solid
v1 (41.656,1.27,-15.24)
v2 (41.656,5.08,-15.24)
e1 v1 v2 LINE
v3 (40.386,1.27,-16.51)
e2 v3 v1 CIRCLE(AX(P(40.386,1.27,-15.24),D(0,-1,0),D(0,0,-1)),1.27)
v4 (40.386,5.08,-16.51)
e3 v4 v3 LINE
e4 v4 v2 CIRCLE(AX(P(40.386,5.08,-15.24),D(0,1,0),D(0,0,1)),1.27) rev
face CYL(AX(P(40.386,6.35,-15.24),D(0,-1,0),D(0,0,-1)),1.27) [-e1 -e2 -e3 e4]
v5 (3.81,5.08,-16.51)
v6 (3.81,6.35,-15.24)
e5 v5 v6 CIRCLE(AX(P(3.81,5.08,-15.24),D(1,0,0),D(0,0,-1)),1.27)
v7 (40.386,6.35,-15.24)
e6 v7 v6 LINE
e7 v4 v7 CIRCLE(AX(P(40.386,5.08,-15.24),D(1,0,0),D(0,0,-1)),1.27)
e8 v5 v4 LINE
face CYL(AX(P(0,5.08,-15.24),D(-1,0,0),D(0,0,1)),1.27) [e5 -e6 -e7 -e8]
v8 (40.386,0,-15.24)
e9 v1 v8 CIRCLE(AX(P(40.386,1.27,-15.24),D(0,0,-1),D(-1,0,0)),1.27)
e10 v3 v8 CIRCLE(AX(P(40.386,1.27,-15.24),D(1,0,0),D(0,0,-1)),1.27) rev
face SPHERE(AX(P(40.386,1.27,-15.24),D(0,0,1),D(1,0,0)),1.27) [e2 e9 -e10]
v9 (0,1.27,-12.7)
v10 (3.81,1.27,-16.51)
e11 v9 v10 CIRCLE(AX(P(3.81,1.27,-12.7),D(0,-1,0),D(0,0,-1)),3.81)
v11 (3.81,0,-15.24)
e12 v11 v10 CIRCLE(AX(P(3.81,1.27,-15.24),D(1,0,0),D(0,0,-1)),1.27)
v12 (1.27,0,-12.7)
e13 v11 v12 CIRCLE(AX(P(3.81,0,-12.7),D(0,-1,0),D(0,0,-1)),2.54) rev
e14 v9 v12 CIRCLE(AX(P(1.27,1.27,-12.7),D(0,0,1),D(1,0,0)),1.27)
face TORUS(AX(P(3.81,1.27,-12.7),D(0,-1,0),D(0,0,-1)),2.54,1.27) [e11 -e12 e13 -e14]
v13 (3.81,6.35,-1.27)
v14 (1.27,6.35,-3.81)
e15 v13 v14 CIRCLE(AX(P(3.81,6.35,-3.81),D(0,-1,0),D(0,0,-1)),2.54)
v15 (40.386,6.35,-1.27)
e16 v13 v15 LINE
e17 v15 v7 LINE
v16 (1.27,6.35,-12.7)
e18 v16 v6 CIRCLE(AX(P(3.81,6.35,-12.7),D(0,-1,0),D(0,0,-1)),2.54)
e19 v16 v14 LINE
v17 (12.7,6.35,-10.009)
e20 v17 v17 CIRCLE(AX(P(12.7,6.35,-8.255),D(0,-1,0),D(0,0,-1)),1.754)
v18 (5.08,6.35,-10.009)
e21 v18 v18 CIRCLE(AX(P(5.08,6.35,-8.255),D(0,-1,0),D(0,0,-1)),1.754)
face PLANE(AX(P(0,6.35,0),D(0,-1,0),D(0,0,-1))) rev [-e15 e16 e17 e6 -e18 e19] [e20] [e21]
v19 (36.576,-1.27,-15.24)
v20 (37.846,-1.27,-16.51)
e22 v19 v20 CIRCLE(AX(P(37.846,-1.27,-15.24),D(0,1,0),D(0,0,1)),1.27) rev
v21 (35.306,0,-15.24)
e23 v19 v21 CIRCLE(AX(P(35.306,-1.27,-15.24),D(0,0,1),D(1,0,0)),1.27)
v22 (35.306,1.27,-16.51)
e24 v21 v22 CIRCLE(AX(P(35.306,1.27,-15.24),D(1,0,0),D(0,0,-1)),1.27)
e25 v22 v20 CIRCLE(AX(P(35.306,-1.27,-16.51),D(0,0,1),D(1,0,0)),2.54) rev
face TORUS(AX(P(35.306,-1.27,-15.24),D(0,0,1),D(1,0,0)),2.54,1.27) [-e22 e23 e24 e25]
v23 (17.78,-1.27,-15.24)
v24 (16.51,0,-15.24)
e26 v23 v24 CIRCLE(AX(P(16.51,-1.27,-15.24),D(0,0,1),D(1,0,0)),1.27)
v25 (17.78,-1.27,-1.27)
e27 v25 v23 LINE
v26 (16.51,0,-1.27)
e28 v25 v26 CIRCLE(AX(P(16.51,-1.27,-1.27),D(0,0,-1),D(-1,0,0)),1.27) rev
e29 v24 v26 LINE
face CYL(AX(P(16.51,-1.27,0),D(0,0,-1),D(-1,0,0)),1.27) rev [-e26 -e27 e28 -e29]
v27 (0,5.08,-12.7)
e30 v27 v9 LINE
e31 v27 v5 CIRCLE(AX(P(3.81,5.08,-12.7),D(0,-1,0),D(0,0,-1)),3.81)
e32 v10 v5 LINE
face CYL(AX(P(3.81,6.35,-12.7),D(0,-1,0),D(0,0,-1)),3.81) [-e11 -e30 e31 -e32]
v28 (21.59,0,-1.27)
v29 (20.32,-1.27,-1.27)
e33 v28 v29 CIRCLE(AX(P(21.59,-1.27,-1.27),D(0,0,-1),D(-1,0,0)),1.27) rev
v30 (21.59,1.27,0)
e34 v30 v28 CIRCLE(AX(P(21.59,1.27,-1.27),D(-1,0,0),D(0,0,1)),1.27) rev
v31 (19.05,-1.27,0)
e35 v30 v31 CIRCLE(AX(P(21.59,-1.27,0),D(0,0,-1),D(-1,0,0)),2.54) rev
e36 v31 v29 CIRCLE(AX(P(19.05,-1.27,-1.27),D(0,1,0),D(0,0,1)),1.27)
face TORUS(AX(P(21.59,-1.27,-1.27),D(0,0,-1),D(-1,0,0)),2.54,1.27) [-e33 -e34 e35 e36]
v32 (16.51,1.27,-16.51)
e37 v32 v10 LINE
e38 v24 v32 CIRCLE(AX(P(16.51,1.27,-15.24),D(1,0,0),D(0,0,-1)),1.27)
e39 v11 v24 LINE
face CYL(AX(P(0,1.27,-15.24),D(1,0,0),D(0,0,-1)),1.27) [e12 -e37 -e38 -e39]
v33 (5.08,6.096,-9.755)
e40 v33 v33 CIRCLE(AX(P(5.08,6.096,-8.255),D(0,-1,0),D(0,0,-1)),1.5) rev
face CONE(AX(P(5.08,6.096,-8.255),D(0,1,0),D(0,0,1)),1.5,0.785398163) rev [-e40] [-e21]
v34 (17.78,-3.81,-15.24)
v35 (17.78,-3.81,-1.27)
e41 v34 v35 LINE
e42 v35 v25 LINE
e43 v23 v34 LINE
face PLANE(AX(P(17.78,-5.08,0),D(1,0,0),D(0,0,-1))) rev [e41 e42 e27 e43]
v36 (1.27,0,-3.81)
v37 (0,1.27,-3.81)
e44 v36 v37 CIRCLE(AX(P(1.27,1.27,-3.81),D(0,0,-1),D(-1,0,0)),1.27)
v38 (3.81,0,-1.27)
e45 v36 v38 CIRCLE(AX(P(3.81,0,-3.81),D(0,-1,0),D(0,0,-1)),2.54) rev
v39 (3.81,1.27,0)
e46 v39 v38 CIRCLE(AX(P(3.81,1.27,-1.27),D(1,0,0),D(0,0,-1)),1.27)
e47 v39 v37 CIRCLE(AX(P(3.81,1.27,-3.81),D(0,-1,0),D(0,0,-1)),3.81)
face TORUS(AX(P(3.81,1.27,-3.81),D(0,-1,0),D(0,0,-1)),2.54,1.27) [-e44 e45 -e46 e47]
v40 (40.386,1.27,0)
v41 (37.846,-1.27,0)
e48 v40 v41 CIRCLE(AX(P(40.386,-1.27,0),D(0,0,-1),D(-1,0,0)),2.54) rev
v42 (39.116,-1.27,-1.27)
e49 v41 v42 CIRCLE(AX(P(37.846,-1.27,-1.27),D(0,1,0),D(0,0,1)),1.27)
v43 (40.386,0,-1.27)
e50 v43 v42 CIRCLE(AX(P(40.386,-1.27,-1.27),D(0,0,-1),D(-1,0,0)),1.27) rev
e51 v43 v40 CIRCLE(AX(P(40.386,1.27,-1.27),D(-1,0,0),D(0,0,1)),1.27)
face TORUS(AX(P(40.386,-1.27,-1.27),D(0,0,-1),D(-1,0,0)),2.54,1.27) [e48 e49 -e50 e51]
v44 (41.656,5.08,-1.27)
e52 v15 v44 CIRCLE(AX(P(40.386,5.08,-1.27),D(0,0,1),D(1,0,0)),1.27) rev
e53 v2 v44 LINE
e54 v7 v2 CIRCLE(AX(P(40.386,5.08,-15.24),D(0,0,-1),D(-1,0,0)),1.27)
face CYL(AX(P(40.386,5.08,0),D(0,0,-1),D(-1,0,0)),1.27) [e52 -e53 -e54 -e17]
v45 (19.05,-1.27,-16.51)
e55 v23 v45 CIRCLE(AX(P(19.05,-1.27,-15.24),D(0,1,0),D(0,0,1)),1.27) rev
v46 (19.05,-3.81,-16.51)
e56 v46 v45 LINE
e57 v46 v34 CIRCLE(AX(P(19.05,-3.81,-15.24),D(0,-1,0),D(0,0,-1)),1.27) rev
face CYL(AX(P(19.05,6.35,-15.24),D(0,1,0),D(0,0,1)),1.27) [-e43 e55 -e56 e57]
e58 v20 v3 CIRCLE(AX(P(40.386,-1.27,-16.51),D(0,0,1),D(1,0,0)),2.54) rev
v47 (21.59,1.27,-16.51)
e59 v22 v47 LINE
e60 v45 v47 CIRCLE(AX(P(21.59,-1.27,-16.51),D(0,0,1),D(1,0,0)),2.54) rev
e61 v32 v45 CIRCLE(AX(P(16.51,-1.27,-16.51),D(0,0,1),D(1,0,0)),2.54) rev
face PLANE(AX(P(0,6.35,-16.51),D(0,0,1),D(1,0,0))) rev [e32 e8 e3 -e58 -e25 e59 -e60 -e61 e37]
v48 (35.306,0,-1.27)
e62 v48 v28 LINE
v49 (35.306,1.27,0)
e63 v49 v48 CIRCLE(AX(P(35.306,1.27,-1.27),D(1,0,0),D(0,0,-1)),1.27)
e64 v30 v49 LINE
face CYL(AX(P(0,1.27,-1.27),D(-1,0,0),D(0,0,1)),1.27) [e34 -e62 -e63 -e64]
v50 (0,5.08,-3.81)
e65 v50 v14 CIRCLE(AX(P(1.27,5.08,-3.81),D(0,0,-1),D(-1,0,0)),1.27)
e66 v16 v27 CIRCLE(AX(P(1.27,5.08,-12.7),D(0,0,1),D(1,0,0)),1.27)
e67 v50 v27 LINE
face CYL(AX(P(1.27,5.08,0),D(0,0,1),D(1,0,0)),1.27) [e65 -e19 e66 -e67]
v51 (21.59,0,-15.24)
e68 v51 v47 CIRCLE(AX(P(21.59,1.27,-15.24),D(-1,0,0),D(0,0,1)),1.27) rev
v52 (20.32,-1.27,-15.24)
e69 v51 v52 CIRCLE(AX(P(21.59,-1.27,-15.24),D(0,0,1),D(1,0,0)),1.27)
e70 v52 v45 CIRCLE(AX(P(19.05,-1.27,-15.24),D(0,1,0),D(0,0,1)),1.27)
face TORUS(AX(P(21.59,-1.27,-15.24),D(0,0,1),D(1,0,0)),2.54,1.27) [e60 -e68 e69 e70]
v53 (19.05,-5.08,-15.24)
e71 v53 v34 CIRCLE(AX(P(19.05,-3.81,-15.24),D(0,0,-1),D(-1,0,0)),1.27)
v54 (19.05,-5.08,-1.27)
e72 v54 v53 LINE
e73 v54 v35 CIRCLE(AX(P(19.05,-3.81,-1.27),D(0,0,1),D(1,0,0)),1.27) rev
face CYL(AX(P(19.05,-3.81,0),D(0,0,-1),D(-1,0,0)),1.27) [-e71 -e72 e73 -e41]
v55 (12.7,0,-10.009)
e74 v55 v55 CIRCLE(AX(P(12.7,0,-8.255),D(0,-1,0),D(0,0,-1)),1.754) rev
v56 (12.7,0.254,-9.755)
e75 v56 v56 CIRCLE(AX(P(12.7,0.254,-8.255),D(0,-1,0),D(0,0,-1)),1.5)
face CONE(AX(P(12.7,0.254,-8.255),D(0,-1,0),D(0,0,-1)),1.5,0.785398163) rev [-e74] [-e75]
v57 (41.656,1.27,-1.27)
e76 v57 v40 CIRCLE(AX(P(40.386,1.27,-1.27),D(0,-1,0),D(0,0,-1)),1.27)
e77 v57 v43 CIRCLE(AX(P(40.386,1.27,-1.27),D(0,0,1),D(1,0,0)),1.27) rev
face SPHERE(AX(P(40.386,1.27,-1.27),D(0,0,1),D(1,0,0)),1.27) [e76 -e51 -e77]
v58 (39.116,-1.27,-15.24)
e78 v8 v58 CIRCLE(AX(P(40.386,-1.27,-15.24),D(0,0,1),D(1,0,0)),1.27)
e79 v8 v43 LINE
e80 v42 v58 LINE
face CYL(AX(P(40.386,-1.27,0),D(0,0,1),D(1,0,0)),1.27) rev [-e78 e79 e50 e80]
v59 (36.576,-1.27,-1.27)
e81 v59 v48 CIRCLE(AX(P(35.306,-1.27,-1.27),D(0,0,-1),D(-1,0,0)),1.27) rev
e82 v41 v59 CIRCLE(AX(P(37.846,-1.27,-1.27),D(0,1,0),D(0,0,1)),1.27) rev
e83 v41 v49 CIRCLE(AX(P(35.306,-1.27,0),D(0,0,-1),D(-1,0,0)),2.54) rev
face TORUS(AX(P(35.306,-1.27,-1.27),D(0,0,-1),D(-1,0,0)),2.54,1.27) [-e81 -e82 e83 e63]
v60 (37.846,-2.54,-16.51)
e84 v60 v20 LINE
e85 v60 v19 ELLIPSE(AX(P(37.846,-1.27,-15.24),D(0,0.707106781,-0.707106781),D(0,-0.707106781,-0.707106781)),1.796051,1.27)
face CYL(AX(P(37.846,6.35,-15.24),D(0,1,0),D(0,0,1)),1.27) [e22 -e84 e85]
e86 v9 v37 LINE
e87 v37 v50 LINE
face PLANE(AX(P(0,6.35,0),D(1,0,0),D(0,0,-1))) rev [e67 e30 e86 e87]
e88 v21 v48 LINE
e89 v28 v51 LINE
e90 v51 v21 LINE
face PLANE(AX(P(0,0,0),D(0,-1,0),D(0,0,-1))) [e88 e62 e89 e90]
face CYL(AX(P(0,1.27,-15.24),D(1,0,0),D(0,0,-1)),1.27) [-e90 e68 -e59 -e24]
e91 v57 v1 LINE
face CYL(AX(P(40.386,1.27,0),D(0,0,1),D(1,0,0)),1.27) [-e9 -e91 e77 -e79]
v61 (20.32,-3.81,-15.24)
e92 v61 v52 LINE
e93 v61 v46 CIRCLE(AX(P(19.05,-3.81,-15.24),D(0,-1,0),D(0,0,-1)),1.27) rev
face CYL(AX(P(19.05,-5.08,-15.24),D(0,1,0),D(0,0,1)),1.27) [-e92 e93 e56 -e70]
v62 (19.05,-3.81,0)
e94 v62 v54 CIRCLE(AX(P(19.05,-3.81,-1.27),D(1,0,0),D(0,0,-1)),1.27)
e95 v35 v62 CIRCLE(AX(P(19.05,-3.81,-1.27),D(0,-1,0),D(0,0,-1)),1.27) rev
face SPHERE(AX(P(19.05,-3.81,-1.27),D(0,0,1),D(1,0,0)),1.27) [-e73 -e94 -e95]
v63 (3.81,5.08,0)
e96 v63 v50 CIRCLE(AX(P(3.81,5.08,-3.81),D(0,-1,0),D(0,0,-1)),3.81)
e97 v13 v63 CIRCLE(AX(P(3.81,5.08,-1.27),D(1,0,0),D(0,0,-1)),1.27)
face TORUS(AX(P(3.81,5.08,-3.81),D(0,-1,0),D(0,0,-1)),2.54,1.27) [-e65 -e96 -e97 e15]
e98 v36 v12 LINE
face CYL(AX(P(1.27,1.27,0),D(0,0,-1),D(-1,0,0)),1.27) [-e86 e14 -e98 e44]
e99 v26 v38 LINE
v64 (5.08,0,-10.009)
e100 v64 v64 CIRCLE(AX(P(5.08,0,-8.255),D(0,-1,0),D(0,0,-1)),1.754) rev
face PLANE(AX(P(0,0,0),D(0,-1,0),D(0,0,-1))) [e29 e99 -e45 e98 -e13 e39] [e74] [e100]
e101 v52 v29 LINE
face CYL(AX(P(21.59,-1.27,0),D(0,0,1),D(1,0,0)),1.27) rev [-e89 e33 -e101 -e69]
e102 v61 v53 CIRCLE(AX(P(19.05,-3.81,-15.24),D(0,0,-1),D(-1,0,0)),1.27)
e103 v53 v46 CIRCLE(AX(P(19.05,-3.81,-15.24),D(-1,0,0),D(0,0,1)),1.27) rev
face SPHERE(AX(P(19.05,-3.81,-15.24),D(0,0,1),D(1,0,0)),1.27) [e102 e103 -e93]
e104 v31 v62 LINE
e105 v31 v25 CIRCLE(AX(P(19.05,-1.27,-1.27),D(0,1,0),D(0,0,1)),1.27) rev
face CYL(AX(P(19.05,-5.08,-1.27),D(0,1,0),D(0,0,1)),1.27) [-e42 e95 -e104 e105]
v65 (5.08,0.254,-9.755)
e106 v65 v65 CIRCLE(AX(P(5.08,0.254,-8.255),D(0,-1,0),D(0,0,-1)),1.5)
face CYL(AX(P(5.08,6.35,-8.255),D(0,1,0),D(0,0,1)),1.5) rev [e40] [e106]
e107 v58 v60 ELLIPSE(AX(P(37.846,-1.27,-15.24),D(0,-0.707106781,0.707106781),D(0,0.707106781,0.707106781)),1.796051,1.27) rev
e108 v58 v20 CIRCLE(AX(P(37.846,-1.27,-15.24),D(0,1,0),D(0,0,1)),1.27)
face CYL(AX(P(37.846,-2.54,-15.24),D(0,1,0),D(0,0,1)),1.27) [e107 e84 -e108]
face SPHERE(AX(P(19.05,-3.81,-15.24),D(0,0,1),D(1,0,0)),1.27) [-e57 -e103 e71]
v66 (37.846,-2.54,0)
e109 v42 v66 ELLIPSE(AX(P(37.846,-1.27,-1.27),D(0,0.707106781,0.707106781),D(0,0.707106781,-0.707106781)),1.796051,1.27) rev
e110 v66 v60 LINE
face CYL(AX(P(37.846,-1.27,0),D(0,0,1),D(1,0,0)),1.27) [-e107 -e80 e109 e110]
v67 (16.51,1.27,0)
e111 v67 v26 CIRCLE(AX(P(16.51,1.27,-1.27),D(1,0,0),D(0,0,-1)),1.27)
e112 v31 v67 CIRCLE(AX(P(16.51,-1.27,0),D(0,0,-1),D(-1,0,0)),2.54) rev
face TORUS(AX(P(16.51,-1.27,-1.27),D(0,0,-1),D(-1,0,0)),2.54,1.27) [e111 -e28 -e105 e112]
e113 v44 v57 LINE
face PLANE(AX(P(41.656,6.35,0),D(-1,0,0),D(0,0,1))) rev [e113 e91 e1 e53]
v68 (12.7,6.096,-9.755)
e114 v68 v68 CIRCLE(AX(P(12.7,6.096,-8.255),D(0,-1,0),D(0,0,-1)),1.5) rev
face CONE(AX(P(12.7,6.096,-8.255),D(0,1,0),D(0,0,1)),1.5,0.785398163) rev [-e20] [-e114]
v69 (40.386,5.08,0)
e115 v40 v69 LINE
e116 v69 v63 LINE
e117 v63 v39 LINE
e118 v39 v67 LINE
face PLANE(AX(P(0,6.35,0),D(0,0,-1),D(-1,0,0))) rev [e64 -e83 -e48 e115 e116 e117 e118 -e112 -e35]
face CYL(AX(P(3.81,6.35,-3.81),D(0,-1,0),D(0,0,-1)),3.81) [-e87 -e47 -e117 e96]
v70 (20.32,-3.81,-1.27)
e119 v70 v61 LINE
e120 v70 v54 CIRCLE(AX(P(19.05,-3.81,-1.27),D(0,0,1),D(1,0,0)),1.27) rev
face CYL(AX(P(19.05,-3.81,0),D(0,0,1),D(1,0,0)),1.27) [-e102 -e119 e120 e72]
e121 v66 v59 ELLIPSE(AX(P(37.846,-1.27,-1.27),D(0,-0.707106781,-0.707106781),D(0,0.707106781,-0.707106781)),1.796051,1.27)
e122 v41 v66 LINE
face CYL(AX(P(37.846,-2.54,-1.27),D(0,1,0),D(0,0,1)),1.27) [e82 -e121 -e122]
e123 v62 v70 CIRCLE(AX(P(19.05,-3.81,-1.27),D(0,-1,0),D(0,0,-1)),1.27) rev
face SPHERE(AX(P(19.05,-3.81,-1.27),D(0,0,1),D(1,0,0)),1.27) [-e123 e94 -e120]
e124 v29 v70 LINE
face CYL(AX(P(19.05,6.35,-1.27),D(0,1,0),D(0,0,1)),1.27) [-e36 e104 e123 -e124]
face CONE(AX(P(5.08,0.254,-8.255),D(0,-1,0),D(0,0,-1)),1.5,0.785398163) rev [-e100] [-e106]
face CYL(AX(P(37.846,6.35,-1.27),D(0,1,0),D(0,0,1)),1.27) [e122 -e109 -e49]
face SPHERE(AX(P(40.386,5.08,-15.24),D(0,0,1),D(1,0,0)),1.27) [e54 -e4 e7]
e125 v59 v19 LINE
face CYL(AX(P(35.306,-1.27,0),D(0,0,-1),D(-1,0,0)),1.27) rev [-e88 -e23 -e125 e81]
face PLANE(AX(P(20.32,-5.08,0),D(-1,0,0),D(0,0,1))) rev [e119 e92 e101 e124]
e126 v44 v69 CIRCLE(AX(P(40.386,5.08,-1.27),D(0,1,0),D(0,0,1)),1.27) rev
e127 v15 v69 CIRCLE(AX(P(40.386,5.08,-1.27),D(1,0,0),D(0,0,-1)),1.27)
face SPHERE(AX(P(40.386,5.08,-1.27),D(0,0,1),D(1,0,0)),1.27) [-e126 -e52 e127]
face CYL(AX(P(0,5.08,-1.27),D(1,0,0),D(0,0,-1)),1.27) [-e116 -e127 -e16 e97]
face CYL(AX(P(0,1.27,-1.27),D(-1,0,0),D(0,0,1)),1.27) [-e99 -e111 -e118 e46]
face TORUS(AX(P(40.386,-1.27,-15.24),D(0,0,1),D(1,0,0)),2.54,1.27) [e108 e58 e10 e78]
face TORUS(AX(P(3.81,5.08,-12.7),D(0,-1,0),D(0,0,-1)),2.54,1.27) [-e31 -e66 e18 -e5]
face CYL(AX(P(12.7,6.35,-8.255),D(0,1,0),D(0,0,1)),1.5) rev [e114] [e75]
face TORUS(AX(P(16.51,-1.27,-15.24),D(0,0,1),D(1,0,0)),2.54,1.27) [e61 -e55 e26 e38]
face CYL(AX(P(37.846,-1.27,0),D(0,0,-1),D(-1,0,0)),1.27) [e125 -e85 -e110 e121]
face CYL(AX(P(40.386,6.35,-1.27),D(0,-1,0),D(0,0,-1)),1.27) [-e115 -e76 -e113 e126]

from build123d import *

# Parameters (mm, degrees)
SKETCH1_W             = 41.656
SKETCH1_H             = 16.51
BOSS_EXTRUDE1_DEPTH   = 6.35
SKETCH2_W             = 2.54
SKETCH2_H             = 16.51
BOSS_EXTRUDE2_DEPTH   = 2.54
SKETCH3_W             = 2.54
SKETCH3_H             = 16.51
BOSS_EXTRUDE3_DEPTH   = 5.08
F_3_0MM_DOWEL_HOLE1_D = 3
FILLET1_R             = 1.27
CHAMFER1_SIZE         = 0.254
FILLET2_R             = 3.81


# Some blends are built 0.0001 mm under size
with BuildPart() as part:
    # Sketch1 → Boss-Extrude1 (new body)
    with BuildSketch(Plane(origin=(0, 0, 0), x_dir=(1, 0, 0), z_dir=(0, 1, 0))):
        with Locations((20.828, 8.255)):
            Rectangle(SKETCH1_W, SKETCH1_H)
    extrude(amount=BOSS_EXTRUDE1_DEPTH)

    # Sketch2 → Boss-Extrude2 (add)
    with BuildSketch(Plane.XZ):
        with Locations((37.846, -8.255)):
            Rectangle(SKETCH2_W, SKETCH2_H)
    extrude(amount=BOSS_EXTRUDE2_DEPTH)

    # Sketch3 → Boss-Extrude3 (add)
    with BuildSketch(Plane.XZ):
        with Locations((19.05, -8.255)):
            Rectangle(SKETCH3_W, SKETCH3_H)
    extrude(amount=BOSS_EXTRUDE3_DEPTH)

    # Ø3.0mm Dowel Hole1 (through all)
    with Locations(Plane(origin=(0, 6.35, 0), x_dir=(1, 0, 0), z_dir=(0, 1, 0))):
        with Locations((5.08, 8.255), (12.7, 8.255)):
            Hole(F_3_0MM_DOWEL_HOLE1_D / 2)

    # Fillet1
    fillet1_edges = [part.edges().sort_by_distance(p)[0] for p in [
        (41.656, 6.35, -8.255),
        (20.828, 6.35, -16.51),
        (28.448, 0, -16.51),
        (40.386, 0, 0),
        (39.116, 0, -8.255),
        (39.116, -1.27, -16.51),
        (39.116, -1.27, 0),
        (36.576, 0, -8.255),
        (36.576, -1.27, 0),
        (36.576, -1.27, -16.51),
        (39.116, -2.54, -8.255),
        (36.576, -2.54, -8.255),
        (28.448, 0, 0),
        (8.89, 0, -16.51),
        (20.32, 0, -8.255),
        (20.32, -2.54, -16.51),
        (20.32, -2.54, 0),
        (17.78, 0, -8.255),
        (17.78, -2.54, 0),
        (17.78, -2.54, -16.51),
        (20.32, -5.08, -8.255),
        (19.05, -5.08, 0),
        (17.78, -5.08, -8.255),
        (19.05, -5.08, -16.51),
        (0, 6.35, -8.255),
        (40.386, 0, -16.51),
        (41.656, 0, -8.255),
        (8.89, 0, 0),
        (0, 0, -8.255),
        (20.828, 6.35, 0),
        (41.656, 3.175, -16.51),
        (41.656, 3.175, 0),
    ]]
    fillet(fillet1_edges, radius=FILLET1_R - 0.0001)  # a hair under: the kernel refuses the full size

    # Chamfer1
    chamfer1_edges = [part.edges().sort_by_distance(p)[0] for p in [
        (14.2, 0, -8.255),
        (14.2, 6.35, -8.255),
        (6.58, 0, -8.255),
        (6.58, 6.35, -8.255),
    ]]
    chamfer(chamfer1_edges, length=CHAMFER1_SIZE)

    # Fillet2
    # the kernel refuses this fillet: 3.81 mm, written as the material it takes off along each edge
    with BuildSketch(Plane(origin=(3.81, 0, -3.81), x_dir=(0, 0, 1), z_dir=(1, 0, 0))) as fillet2_piece_1:
        with BuildLine():
            CenterArc((2.5401, -1.2699), 1.2699, 0, 90)
            Line((3.81, -1.2699), (3.81, 0))
            Line((3.81, 0), (2.5401, 0))
        make_face()
    revolve(axis=Axis((3.81, 0, -3.81), (0, -1, 0)), revolution_arc=90, mode=Mode.SUBTRACT)
    with BuildSketch(Plane(origin=(3.81, 0, -12.7), x_dir=(-1, 0, 0), z_dir=(0, 0, 1))) as fillet2_piece_2:
        with BuildLine():
            CenterArc((2.5401, -1.2699), 1.2699, 0, 90)
            Line((3.81, -1.2699), (3.81, 0))
            Line((3.81, 0), (2.5401, 0))
        make_face()
    revolve(axis=Axis((3.81, 0, -12.7), (0, -1, 0)), revolution_arc=90, mode=Mode.SUBTRACT)
    with BuildSketch(Plane(origin=(3.81, 6.35, -3.81), x_dir=(-1, 0, 0), z_dir=(0, 0, -1))) as fillet2_piece_3:
        with BuildLine():
            CenterArc((2.5401, -1.2699), 1.2699, 0, 90)
            Line((3.81, -1.2699), (3.81, 0))
            Line((3.81, 0), (2.5401, 0))
        make_face()
    revolve(axis=Axis((3.81, 6.35, -3.81), (0, 1, 0)), revolution_arc=90, mode=Mode.SUBTRACT)
    with BuildSketch(Plane(origin=(3.81, 6.35, -12.7), x_dir=(0, 0, -1), z_dir=(1, 0, 0))) as fillet2_piece_4:
        with BuildLine():
            CenterArc((2.5401, -1.2699), 1.2699, 0, 90)
            Line((3.81, -1.2699), (3.81, 0))
            Line((3.81, 0), (2.5401, 0))
        make_face()
    revolve(axis=Axis((3.81, 6.35, -12.7), (0, 1, 0)), revolution_arc=90, mode=Mode.SUBTRACT)
    with BuildSketch(Plane(origin=(0, 0, -16.51), x_dir=(1, 0, 0), z_dir=(0, 1, 0)), Plane(origin=(0, 0, 0), x_dir=(0, 0, -1), z_dir=(0, 1, 0))) as fillet2_piece_5:
        with BuildLine():
            CenterArc((FILLET2_R, -FILLET2_R), FILLET2_R, 90, 90)
            Line((0, -FILLET2_R), (0, 0))
            Line((0, 0), (FILLET2_R, 0))
        make_face()
    extrude(amount=6.35, mode=Mode.SUBTRACT)


solid = part.part
